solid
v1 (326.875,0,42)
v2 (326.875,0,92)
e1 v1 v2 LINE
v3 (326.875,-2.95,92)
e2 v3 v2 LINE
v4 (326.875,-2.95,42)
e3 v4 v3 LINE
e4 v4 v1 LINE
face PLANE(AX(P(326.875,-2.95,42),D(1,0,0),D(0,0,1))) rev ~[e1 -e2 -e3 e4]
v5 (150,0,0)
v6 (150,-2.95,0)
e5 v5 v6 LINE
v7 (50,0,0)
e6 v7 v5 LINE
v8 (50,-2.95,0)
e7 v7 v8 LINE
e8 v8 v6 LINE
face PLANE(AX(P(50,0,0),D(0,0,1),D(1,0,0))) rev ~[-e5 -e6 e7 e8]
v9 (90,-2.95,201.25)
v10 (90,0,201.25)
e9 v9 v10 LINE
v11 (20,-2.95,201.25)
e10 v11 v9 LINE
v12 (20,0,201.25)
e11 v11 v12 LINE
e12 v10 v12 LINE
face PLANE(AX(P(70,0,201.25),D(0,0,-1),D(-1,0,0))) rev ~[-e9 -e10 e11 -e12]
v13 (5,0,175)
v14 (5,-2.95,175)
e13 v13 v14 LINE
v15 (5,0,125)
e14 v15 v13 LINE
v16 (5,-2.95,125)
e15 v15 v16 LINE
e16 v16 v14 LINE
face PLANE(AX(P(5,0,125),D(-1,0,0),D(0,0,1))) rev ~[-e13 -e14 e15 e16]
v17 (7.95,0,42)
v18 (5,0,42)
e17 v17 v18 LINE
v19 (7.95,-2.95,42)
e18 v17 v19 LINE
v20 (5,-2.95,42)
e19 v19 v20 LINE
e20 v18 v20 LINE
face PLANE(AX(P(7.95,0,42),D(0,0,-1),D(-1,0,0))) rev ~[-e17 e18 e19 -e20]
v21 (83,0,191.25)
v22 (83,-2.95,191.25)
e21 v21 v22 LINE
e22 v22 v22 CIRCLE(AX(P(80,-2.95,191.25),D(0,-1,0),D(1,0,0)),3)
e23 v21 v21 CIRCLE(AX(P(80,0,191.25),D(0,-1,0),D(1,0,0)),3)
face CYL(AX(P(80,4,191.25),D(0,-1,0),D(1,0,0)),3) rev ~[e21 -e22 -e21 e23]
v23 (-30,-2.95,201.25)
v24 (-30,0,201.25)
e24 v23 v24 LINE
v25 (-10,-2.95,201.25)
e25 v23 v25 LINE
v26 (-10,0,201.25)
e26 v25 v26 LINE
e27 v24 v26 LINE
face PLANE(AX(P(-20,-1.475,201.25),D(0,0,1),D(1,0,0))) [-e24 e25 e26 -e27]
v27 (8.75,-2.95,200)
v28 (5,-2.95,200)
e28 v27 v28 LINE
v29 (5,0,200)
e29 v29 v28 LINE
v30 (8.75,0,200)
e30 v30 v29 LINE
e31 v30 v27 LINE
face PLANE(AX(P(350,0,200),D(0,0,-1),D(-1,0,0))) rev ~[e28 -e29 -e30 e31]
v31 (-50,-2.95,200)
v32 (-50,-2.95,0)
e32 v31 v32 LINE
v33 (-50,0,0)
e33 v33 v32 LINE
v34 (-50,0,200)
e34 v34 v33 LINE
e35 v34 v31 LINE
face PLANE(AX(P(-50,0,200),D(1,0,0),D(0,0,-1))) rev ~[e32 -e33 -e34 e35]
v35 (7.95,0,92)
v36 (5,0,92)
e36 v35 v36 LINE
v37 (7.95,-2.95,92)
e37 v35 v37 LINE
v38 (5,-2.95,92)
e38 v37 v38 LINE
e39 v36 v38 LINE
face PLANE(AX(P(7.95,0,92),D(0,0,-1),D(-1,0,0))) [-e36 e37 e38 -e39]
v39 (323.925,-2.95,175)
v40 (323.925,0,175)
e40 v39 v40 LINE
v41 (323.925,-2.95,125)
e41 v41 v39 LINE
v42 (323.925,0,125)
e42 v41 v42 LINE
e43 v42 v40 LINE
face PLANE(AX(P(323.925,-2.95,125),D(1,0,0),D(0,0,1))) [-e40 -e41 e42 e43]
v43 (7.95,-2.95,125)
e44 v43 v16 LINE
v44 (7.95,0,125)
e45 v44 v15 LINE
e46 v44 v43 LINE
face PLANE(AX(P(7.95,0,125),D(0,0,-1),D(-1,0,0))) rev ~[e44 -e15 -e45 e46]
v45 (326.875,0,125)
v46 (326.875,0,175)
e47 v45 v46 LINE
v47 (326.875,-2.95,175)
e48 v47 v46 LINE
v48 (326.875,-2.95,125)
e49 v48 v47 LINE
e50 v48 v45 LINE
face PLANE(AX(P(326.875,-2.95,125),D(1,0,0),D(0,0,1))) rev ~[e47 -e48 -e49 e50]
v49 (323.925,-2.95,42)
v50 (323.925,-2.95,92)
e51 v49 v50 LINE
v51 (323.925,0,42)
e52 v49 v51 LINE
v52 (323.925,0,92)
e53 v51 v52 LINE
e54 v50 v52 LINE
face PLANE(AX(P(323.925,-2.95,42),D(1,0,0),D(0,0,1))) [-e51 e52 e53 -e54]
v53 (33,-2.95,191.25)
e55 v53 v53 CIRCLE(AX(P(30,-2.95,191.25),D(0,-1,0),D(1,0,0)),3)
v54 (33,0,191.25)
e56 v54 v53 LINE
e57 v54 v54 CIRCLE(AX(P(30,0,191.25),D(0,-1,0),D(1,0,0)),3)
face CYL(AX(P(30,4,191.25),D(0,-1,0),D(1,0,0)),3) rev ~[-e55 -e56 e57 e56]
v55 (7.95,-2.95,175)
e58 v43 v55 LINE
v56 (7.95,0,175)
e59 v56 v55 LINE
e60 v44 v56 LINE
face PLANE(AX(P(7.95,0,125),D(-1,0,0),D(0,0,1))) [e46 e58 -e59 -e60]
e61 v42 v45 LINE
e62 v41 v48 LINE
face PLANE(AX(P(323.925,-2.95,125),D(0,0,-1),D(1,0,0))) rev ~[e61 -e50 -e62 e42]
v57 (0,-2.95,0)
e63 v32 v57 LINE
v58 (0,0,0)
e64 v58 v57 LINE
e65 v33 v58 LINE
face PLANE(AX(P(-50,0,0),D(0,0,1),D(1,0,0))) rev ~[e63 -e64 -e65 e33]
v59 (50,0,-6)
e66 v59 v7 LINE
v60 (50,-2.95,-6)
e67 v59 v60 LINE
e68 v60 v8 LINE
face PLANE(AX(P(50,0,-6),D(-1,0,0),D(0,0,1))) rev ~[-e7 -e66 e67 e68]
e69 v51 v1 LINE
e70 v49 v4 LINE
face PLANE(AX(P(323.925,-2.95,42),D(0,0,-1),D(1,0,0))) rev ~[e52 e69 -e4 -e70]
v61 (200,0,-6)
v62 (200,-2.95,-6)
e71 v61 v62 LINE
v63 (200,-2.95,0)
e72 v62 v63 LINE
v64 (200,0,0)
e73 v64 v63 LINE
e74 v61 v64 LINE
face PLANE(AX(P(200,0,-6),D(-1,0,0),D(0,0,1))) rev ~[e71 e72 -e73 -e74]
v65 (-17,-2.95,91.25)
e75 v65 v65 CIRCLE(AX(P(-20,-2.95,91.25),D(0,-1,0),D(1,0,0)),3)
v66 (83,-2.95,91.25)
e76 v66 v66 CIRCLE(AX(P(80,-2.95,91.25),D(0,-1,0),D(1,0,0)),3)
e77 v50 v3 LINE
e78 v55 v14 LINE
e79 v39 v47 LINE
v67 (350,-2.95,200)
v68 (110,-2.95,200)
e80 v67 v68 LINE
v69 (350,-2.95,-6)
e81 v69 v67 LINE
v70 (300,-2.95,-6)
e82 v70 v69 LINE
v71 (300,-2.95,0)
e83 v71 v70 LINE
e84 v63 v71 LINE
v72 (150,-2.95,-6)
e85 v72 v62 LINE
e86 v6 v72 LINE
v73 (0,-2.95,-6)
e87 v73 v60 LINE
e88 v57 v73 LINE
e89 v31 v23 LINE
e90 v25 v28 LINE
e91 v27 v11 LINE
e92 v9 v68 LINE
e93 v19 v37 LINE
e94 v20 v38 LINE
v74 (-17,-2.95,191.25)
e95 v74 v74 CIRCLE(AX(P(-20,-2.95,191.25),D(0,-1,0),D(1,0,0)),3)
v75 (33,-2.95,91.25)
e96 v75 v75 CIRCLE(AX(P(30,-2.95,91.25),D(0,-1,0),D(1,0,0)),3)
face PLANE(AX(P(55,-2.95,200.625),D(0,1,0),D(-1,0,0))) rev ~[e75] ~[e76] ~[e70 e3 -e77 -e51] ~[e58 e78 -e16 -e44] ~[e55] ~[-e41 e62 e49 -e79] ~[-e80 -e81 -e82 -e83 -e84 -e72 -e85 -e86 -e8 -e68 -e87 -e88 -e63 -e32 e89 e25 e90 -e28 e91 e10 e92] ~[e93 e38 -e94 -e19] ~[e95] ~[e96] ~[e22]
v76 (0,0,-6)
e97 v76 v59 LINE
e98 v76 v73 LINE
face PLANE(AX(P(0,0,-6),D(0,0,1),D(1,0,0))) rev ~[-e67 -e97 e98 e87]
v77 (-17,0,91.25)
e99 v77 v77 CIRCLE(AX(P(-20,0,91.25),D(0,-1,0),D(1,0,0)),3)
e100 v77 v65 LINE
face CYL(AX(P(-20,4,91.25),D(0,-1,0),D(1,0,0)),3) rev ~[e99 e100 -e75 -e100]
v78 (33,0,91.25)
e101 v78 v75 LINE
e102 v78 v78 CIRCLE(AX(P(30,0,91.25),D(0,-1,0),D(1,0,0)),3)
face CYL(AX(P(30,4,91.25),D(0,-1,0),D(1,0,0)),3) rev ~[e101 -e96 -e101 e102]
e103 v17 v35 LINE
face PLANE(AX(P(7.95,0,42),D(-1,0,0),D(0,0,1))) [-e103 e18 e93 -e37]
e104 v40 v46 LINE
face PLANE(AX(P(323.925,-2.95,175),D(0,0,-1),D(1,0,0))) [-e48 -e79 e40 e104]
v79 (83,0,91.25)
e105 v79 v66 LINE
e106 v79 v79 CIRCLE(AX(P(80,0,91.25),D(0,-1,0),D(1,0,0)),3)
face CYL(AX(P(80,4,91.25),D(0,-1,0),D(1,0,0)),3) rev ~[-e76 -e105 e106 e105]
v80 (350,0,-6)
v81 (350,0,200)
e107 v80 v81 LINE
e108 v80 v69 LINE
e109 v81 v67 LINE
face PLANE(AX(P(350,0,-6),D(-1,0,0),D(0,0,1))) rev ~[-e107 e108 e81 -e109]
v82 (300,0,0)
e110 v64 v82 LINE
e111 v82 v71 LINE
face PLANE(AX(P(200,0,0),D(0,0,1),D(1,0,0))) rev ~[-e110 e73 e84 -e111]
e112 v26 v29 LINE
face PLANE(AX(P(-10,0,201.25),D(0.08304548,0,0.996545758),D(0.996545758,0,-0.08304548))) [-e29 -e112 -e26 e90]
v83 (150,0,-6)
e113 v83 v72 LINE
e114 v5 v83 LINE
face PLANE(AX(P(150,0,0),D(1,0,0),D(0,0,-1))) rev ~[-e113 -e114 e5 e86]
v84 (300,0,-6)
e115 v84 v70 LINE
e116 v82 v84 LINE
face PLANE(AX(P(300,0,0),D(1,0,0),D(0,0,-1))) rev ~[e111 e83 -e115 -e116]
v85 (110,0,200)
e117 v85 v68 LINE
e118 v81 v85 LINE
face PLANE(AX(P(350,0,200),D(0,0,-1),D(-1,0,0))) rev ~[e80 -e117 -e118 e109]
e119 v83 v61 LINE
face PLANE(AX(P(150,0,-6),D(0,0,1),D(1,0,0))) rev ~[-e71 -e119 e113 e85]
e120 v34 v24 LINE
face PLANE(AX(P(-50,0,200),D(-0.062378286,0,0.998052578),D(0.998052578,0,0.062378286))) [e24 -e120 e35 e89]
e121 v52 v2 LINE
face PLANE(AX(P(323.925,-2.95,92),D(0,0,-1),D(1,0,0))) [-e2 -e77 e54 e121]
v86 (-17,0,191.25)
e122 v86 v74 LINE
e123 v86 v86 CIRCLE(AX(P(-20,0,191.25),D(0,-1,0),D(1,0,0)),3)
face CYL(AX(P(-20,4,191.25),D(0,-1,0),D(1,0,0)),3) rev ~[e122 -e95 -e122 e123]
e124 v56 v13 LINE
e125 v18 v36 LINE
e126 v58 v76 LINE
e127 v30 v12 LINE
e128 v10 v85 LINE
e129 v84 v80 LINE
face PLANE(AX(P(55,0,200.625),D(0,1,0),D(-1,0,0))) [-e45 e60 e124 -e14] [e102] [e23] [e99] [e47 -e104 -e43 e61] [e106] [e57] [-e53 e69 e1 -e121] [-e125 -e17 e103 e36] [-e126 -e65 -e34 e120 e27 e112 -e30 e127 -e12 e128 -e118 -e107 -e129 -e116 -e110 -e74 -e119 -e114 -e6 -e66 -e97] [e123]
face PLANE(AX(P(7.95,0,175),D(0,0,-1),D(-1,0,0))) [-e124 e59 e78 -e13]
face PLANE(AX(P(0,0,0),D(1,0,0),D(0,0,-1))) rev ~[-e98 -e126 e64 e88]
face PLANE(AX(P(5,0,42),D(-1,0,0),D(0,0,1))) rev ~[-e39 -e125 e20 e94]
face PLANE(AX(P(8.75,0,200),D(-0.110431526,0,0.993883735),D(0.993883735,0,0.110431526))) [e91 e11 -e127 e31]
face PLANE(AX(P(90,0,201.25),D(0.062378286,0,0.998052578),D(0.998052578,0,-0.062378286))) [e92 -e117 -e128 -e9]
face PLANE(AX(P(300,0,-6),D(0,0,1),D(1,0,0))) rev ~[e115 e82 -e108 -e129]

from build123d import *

# Parameters (mm, degrees)
F1_DEPTH  = 2.95
F2_W      = 2.95
F2_H      = 50
F3_DEPTH  = 2.95
F4_W      = 20
F4_H      = 2.95
F5_DEPTH  = 1.25
F7_D      = 6
F7_DEPTH  = 4
F7_TIP    = 1.8025818571
F8_W      = 30
F8_H      = 1.25
F9_DEPTH  = 2.95
F10_W     = 2.95
F10_H     = 50
F11_DEPTH = 2.95


# Not quite as in the source:
# - a feature names something its author has since deleted; it is built from what else it names


with BuildPart() as f1:
    # F0 (on Front) → F1 (new body)
    with BuildSketch(Plane.XZ):
        Polygon((50, -6), (50, 0), (150, 0), (150, -6), (200, -6), (200, 0), (300, 0), (300, -6), (350, -6), (350, 0), (350, 200), (0, 200), (-50, 200), (-50, 0), (0, 0), (0, -6), align=None)
    extrude(amount=F1_DEPTH)

    # F2 (on face) → F3 (cut)
    with BuildSketch(Plane.XZ.offset(2.95)):
        with Locations((325.4, 150)):
            Rectangle(F2_W, F2_H)
        with Locations((325.4, 67)):
            Rectangle(F2_W, F2_H)
    extrude(amount=-F3_DEPTH, mode=Mode.SUBTRACT)

    # F4 (on face) → F5 (join)
    with BuildSketch(Plane.XY.offset(200)):
        with Locations((80, -1.475)):
            Rectangle(F4_W, F4_H)
        with Locations((30, -1.475)):
            Rectangle(F4_W, F4_H)
        with Locations((-20, -1.475)):
            Rectangle(F4_W, F4_H)
    extrude(amount=F5_DEPTH)

    # F7
    with Locations(Plane(origin=(0, 0, 0), x_dir=(-1, 0, 0), z_dir=(0, 1, 0))):
        with Locations((-80, 91.25), (-80, 191.25), (-30, 91.25), (20, 91.25), (20, 191.25), (-30, 191.25)):
            Hole(F7_D / 2, depth=F7_DEPTH)
            with Locations((0, 0, -(F7_DEPTH + F7_TIP / 2))):  # 118° drill point
                Cone(0, F7_D / 2, F7_TIP, mode=Mode.SUBTRACT)

    # F8 (on face) → F9 (join)
    with BuildSketch(Plane(origin=(0, 0, 0), x_dir=(-1, 0, 0), z_dir=(0, 1, 0))):
        with Locations((-55, 200.625)):
            Rectangle(F8_W, F8_H)
        Polygon((30, 201.25), (30, 200), (50, 200), align=None)
        Polygon((-90, 200), (-90, 201.25), (-110, 200), align=None)
        Polygon((10, 201.25), (-5, 200), (10, 200), align=None)
        Polygon((-8.75, 200), (-20, 201.25), (-20, 200), align=None)
    extrude(amount=-F9_DEPTH)

    # F10 (on face) → F11 (cut)
    with BuildSketch(Plane(origin=(0, 0, 0), x_dir=(-1, 0, 0), z_dir=(0, 1, 0))):
        with Locations((-6.475, 150)):
            Rectangle(F10_W, F10_H)
        with Locations((-6.475, 67)):
            Rectangle(F10_W, F10_H)
    extrude(amount=-F11_DEPTH, mode=Mode.SUBTRACT)


solid = f1.part
